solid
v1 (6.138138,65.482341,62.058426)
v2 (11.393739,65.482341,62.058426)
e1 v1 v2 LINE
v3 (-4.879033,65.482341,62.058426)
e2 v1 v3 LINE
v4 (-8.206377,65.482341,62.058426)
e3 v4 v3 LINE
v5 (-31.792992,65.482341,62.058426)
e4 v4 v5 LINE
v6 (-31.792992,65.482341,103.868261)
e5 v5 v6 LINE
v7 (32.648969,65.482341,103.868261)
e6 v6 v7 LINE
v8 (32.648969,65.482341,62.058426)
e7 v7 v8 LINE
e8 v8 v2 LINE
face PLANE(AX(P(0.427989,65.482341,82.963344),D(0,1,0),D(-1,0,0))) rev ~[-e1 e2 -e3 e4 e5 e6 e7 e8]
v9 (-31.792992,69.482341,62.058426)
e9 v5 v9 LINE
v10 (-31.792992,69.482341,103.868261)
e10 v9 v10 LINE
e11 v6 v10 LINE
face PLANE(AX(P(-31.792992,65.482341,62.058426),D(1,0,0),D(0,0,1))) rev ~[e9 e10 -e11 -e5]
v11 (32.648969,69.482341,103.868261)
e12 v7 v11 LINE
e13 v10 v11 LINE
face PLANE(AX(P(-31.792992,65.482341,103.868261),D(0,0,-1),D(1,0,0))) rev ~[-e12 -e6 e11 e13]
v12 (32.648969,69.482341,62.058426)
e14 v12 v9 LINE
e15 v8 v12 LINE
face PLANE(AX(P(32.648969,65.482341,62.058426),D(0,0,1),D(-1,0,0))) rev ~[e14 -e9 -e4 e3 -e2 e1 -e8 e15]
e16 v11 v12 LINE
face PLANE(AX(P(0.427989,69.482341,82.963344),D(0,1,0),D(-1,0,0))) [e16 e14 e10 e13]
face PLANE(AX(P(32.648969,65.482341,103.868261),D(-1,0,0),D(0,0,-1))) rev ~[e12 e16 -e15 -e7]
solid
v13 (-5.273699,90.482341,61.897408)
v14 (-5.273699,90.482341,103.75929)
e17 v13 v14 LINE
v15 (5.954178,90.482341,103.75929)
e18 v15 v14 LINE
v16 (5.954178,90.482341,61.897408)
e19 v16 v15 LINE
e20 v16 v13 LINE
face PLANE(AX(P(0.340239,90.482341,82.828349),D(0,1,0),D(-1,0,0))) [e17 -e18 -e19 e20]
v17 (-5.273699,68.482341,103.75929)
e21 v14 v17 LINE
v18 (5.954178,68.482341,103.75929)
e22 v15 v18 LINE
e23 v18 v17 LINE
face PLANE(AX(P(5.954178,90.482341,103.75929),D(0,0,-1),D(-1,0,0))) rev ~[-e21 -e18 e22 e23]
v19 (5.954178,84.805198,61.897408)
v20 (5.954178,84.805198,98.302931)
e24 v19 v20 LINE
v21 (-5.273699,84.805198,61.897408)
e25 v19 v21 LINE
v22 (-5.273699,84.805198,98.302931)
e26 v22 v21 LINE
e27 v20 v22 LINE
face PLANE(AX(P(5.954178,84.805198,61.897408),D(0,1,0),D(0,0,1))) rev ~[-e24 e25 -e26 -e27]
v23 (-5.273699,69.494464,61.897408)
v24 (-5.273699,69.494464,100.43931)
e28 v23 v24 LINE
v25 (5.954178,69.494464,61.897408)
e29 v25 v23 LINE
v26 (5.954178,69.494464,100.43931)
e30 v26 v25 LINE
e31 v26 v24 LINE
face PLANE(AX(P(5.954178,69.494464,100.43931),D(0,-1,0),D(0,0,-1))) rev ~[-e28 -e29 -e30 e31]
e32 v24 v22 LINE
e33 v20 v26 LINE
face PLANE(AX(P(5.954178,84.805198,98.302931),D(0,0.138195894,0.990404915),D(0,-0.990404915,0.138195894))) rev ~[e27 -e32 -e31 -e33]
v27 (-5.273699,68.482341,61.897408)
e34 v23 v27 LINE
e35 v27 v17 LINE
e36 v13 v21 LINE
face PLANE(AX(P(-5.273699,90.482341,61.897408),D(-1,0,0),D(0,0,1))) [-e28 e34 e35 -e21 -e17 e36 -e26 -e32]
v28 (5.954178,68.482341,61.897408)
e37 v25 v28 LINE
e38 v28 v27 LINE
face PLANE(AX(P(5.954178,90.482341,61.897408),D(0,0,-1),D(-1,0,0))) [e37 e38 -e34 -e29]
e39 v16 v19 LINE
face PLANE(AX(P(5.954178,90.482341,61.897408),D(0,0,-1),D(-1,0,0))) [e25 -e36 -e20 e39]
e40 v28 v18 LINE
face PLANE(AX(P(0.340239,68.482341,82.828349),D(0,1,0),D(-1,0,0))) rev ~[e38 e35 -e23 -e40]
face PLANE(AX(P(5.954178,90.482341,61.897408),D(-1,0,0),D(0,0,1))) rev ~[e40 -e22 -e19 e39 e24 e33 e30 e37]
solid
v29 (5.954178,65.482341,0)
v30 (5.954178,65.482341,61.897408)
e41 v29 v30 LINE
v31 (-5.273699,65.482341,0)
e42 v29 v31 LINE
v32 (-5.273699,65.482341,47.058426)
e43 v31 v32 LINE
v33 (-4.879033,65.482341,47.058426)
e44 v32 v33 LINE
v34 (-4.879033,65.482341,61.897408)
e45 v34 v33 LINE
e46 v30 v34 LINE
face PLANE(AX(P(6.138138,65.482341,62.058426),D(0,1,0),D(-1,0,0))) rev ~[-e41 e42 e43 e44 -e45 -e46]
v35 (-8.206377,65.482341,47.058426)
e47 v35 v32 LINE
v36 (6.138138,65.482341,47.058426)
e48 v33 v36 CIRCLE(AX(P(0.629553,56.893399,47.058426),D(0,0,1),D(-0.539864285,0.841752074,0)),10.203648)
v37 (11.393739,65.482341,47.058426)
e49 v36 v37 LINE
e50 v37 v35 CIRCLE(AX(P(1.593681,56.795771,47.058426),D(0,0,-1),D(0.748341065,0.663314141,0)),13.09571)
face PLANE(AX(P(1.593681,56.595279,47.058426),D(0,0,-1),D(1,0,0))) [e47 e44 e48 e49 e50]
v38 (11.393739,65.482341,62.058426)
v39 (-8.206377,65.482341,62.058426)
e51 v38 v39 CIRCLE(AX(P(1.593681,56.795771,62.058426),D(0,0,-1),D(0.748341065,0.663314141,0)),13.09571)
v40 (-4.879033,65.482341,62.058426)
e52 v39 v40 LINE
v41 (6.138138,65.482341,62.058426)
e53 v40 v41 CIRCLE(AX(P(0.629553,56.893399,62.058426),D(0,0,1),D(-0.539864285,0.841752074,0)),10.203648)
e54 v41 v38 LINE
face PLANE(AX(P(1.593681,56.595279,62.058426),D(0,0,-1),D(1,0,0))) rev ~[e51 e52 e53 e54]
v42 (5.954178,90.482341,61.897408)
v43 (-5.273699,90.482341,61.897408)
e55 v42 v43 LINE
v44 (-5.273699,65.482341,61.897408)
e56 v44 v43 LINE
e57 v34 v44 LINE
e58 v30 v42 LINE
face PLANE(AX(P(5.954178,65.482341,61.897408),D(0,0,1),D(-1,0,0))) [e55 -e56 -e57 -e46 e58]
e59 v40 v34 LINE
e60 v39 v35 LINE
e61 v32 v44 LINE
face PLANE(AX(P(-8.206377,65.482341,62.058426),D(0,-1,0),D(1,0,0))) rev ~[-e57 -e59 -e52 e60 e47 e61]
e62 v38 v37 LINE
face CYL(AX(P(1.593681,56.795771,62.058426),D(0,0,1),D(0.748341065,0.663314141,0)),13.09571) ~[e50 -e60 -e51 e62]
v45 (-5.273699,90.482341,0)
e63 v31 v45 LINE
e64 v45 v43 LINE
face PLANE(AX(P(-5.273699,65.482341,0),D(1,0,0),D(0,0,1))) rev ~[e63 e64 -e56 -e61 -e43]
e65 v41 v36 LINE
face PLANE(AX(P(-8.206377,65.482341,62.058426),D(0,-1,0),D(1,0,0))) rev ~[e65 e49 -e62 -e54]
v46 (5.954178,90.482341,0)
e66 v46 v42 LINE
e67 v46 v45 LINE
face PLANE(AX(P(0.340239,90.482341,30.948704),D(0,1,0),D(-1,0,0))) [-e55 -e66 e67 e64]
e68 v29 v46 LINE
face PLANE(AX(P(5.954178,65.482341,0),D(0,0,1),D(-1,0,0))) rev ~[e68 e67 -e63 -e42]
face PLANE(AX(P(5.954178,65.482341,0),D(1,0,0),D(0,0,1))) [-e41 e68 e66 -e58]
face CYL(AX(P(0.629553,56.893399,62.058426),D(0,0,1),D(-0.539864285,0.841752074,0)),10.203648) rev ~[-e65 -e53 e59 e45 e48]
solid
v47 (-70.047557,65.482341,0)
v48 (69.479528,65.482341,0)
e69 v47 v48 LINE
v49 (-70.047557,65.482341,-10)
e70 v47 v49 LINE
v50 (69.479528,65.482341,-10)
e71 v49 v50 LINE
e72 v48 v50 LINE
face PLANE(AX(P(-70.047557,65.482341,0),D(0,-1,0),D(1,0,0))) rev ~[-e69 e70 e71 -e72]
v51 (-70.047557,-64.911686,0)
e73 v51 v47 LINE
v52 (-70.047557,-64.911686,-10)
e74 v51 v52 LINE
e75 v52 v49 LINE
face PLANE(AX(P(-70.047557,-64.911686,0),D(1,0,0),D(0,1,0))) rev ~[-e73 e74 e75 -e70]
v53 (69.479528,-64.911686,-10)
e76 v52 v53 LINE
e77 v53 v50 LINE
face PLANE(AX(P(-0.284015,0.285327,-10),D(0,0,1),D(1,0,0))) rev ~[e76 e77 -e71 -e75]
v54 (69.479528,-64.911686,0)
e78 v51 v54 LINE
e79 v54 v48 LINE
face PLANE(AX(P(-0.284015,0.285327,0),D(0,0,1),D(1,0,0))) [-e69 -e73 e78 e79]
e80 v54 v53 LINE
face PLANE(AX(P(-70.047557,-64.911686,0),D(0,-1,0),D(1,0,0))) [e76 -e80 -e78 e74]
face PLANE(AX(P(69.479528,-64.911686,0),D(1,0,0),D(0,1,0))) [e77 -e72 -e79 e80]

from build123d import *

# Parameters (mm, degrees)
F0_W      = 139.5270854934
F0_H      = 130.3940266371
F1_DEPTH  = 10
F3_DEPTH  = 4
F4_W      = 11.2278764136
F4_H      = 61.8974082172
F5_DEPTH  = 25
F6_W      = 11.2278764136
F6_H      = 41.8618817022
F7_DEPTH  = 22
F9_DEPTH  = 25
F11_DEPTH = 15
F13_DEPTH = 25


with BuildPart() as f1:
    # F0 (on Top) → F1 (new body)
    with BuildSketch(Plane.XY):
        with Locations((-0.2840146073, 0.2853274345)):
            Rectangle(F0_W, F0_H)
    extrude(amount=-F1_DEPTH)


with BuildPart() as f3:
    # F2 (on face) → F3 (new body)
    with BuildSketch(Plane(origin=(0, 65.4823407531, 0), x_dir=(-1, 0, 0), z_dir=(0, 1, 0))):
        Polygon((-32.6489694417, 62.0584264398), (-6.1345105059, 62.0584264398), (5.2785333246, 62.0584264398), (31.7929922603, 62.0584264398), (31.7929922603, 103.8682609797), (-32.6489694417, 103.8682609797), align=None)
    extrude(amount=F3_DEPTH)



with BuildPart() as f5:
    # F4 (on face) → F5 (new body)
    with BuildSketch(Plane(origin=(0, 65.4823407531, 0), x_dir=(-1, 0, 0), z_dir=(0, 1, 0))):
        with Locations((-0.3402393777, 30.9487041086)):
            Rectangle(F4_W, F4_H)
    extrude(amount=F5_DEPTH)


with BuildPart() as f7:
    # F6 (on face) → F7 (new body)
    with BuildSketch(Plane(origin=(0, 90.4823407531, 0), x_dir=(-1, 0, 0), z_dir=(0, 1, 0))):
        with Locations((-0.3402393777, 82.8283490683)):
            Rectangle(F6_W, F6_H)
    extrude(amount=-F7_DEPTH)

    # F8 (on face) → F9 (cut)
    with BuildSketch(Plane.YZ.offset(5.9541775845)):
        Polygon((84.8051980138, 61.8974082172), (84.8051980138, 98.3029305935), (69.4944635034, 100.4393099771), (69.4944635034, 61.8974082172), align=None)
    extrude(amount=-F9_DEPTH, mode=Mode.SUBTRACT)


with BuildPart() as f3_1:
    add(f3.part)

    add(f5.part)  # F11 merges F5
    # F10 (on face) → F11 (join)
    with BuildSketch(Plane(origin=(0, 0, 62.0584264398), x_dir=(1, 0, 0), z_dir=(0, 0, -1))):
        with BuildLine():
            Line((-8.2063768059, -65.4823407531), (11.3937389106, -65.4823407531))
            ThreePointArc((11.3937389106, -65.4823407531), (1.5936810523, -43.7000604931), (-8.2063768059, -65.4823407531))
        make_face()
    extrude(amount=F11_DEPTH)

    # F12 (on face) → F13 (cut)
    with BuildSketch(Plane.XY.offset(62.0584264398)):
        with BuildLine():
            Line((6.1381380074, 65.4823407531), (-4.8790327273, 65.4823407531))
            ThreePointArc((-4.8790327273, 65.4823407531), (0.62955264, 46.6897500929), (6.1381380074, 65.4823407531))
        make_face()
    extrude(amount=-F13_DEPTH, mode=Mode.SUBTRACT)


solid = Compound([f1.part, f7.part, f3_1.part])
